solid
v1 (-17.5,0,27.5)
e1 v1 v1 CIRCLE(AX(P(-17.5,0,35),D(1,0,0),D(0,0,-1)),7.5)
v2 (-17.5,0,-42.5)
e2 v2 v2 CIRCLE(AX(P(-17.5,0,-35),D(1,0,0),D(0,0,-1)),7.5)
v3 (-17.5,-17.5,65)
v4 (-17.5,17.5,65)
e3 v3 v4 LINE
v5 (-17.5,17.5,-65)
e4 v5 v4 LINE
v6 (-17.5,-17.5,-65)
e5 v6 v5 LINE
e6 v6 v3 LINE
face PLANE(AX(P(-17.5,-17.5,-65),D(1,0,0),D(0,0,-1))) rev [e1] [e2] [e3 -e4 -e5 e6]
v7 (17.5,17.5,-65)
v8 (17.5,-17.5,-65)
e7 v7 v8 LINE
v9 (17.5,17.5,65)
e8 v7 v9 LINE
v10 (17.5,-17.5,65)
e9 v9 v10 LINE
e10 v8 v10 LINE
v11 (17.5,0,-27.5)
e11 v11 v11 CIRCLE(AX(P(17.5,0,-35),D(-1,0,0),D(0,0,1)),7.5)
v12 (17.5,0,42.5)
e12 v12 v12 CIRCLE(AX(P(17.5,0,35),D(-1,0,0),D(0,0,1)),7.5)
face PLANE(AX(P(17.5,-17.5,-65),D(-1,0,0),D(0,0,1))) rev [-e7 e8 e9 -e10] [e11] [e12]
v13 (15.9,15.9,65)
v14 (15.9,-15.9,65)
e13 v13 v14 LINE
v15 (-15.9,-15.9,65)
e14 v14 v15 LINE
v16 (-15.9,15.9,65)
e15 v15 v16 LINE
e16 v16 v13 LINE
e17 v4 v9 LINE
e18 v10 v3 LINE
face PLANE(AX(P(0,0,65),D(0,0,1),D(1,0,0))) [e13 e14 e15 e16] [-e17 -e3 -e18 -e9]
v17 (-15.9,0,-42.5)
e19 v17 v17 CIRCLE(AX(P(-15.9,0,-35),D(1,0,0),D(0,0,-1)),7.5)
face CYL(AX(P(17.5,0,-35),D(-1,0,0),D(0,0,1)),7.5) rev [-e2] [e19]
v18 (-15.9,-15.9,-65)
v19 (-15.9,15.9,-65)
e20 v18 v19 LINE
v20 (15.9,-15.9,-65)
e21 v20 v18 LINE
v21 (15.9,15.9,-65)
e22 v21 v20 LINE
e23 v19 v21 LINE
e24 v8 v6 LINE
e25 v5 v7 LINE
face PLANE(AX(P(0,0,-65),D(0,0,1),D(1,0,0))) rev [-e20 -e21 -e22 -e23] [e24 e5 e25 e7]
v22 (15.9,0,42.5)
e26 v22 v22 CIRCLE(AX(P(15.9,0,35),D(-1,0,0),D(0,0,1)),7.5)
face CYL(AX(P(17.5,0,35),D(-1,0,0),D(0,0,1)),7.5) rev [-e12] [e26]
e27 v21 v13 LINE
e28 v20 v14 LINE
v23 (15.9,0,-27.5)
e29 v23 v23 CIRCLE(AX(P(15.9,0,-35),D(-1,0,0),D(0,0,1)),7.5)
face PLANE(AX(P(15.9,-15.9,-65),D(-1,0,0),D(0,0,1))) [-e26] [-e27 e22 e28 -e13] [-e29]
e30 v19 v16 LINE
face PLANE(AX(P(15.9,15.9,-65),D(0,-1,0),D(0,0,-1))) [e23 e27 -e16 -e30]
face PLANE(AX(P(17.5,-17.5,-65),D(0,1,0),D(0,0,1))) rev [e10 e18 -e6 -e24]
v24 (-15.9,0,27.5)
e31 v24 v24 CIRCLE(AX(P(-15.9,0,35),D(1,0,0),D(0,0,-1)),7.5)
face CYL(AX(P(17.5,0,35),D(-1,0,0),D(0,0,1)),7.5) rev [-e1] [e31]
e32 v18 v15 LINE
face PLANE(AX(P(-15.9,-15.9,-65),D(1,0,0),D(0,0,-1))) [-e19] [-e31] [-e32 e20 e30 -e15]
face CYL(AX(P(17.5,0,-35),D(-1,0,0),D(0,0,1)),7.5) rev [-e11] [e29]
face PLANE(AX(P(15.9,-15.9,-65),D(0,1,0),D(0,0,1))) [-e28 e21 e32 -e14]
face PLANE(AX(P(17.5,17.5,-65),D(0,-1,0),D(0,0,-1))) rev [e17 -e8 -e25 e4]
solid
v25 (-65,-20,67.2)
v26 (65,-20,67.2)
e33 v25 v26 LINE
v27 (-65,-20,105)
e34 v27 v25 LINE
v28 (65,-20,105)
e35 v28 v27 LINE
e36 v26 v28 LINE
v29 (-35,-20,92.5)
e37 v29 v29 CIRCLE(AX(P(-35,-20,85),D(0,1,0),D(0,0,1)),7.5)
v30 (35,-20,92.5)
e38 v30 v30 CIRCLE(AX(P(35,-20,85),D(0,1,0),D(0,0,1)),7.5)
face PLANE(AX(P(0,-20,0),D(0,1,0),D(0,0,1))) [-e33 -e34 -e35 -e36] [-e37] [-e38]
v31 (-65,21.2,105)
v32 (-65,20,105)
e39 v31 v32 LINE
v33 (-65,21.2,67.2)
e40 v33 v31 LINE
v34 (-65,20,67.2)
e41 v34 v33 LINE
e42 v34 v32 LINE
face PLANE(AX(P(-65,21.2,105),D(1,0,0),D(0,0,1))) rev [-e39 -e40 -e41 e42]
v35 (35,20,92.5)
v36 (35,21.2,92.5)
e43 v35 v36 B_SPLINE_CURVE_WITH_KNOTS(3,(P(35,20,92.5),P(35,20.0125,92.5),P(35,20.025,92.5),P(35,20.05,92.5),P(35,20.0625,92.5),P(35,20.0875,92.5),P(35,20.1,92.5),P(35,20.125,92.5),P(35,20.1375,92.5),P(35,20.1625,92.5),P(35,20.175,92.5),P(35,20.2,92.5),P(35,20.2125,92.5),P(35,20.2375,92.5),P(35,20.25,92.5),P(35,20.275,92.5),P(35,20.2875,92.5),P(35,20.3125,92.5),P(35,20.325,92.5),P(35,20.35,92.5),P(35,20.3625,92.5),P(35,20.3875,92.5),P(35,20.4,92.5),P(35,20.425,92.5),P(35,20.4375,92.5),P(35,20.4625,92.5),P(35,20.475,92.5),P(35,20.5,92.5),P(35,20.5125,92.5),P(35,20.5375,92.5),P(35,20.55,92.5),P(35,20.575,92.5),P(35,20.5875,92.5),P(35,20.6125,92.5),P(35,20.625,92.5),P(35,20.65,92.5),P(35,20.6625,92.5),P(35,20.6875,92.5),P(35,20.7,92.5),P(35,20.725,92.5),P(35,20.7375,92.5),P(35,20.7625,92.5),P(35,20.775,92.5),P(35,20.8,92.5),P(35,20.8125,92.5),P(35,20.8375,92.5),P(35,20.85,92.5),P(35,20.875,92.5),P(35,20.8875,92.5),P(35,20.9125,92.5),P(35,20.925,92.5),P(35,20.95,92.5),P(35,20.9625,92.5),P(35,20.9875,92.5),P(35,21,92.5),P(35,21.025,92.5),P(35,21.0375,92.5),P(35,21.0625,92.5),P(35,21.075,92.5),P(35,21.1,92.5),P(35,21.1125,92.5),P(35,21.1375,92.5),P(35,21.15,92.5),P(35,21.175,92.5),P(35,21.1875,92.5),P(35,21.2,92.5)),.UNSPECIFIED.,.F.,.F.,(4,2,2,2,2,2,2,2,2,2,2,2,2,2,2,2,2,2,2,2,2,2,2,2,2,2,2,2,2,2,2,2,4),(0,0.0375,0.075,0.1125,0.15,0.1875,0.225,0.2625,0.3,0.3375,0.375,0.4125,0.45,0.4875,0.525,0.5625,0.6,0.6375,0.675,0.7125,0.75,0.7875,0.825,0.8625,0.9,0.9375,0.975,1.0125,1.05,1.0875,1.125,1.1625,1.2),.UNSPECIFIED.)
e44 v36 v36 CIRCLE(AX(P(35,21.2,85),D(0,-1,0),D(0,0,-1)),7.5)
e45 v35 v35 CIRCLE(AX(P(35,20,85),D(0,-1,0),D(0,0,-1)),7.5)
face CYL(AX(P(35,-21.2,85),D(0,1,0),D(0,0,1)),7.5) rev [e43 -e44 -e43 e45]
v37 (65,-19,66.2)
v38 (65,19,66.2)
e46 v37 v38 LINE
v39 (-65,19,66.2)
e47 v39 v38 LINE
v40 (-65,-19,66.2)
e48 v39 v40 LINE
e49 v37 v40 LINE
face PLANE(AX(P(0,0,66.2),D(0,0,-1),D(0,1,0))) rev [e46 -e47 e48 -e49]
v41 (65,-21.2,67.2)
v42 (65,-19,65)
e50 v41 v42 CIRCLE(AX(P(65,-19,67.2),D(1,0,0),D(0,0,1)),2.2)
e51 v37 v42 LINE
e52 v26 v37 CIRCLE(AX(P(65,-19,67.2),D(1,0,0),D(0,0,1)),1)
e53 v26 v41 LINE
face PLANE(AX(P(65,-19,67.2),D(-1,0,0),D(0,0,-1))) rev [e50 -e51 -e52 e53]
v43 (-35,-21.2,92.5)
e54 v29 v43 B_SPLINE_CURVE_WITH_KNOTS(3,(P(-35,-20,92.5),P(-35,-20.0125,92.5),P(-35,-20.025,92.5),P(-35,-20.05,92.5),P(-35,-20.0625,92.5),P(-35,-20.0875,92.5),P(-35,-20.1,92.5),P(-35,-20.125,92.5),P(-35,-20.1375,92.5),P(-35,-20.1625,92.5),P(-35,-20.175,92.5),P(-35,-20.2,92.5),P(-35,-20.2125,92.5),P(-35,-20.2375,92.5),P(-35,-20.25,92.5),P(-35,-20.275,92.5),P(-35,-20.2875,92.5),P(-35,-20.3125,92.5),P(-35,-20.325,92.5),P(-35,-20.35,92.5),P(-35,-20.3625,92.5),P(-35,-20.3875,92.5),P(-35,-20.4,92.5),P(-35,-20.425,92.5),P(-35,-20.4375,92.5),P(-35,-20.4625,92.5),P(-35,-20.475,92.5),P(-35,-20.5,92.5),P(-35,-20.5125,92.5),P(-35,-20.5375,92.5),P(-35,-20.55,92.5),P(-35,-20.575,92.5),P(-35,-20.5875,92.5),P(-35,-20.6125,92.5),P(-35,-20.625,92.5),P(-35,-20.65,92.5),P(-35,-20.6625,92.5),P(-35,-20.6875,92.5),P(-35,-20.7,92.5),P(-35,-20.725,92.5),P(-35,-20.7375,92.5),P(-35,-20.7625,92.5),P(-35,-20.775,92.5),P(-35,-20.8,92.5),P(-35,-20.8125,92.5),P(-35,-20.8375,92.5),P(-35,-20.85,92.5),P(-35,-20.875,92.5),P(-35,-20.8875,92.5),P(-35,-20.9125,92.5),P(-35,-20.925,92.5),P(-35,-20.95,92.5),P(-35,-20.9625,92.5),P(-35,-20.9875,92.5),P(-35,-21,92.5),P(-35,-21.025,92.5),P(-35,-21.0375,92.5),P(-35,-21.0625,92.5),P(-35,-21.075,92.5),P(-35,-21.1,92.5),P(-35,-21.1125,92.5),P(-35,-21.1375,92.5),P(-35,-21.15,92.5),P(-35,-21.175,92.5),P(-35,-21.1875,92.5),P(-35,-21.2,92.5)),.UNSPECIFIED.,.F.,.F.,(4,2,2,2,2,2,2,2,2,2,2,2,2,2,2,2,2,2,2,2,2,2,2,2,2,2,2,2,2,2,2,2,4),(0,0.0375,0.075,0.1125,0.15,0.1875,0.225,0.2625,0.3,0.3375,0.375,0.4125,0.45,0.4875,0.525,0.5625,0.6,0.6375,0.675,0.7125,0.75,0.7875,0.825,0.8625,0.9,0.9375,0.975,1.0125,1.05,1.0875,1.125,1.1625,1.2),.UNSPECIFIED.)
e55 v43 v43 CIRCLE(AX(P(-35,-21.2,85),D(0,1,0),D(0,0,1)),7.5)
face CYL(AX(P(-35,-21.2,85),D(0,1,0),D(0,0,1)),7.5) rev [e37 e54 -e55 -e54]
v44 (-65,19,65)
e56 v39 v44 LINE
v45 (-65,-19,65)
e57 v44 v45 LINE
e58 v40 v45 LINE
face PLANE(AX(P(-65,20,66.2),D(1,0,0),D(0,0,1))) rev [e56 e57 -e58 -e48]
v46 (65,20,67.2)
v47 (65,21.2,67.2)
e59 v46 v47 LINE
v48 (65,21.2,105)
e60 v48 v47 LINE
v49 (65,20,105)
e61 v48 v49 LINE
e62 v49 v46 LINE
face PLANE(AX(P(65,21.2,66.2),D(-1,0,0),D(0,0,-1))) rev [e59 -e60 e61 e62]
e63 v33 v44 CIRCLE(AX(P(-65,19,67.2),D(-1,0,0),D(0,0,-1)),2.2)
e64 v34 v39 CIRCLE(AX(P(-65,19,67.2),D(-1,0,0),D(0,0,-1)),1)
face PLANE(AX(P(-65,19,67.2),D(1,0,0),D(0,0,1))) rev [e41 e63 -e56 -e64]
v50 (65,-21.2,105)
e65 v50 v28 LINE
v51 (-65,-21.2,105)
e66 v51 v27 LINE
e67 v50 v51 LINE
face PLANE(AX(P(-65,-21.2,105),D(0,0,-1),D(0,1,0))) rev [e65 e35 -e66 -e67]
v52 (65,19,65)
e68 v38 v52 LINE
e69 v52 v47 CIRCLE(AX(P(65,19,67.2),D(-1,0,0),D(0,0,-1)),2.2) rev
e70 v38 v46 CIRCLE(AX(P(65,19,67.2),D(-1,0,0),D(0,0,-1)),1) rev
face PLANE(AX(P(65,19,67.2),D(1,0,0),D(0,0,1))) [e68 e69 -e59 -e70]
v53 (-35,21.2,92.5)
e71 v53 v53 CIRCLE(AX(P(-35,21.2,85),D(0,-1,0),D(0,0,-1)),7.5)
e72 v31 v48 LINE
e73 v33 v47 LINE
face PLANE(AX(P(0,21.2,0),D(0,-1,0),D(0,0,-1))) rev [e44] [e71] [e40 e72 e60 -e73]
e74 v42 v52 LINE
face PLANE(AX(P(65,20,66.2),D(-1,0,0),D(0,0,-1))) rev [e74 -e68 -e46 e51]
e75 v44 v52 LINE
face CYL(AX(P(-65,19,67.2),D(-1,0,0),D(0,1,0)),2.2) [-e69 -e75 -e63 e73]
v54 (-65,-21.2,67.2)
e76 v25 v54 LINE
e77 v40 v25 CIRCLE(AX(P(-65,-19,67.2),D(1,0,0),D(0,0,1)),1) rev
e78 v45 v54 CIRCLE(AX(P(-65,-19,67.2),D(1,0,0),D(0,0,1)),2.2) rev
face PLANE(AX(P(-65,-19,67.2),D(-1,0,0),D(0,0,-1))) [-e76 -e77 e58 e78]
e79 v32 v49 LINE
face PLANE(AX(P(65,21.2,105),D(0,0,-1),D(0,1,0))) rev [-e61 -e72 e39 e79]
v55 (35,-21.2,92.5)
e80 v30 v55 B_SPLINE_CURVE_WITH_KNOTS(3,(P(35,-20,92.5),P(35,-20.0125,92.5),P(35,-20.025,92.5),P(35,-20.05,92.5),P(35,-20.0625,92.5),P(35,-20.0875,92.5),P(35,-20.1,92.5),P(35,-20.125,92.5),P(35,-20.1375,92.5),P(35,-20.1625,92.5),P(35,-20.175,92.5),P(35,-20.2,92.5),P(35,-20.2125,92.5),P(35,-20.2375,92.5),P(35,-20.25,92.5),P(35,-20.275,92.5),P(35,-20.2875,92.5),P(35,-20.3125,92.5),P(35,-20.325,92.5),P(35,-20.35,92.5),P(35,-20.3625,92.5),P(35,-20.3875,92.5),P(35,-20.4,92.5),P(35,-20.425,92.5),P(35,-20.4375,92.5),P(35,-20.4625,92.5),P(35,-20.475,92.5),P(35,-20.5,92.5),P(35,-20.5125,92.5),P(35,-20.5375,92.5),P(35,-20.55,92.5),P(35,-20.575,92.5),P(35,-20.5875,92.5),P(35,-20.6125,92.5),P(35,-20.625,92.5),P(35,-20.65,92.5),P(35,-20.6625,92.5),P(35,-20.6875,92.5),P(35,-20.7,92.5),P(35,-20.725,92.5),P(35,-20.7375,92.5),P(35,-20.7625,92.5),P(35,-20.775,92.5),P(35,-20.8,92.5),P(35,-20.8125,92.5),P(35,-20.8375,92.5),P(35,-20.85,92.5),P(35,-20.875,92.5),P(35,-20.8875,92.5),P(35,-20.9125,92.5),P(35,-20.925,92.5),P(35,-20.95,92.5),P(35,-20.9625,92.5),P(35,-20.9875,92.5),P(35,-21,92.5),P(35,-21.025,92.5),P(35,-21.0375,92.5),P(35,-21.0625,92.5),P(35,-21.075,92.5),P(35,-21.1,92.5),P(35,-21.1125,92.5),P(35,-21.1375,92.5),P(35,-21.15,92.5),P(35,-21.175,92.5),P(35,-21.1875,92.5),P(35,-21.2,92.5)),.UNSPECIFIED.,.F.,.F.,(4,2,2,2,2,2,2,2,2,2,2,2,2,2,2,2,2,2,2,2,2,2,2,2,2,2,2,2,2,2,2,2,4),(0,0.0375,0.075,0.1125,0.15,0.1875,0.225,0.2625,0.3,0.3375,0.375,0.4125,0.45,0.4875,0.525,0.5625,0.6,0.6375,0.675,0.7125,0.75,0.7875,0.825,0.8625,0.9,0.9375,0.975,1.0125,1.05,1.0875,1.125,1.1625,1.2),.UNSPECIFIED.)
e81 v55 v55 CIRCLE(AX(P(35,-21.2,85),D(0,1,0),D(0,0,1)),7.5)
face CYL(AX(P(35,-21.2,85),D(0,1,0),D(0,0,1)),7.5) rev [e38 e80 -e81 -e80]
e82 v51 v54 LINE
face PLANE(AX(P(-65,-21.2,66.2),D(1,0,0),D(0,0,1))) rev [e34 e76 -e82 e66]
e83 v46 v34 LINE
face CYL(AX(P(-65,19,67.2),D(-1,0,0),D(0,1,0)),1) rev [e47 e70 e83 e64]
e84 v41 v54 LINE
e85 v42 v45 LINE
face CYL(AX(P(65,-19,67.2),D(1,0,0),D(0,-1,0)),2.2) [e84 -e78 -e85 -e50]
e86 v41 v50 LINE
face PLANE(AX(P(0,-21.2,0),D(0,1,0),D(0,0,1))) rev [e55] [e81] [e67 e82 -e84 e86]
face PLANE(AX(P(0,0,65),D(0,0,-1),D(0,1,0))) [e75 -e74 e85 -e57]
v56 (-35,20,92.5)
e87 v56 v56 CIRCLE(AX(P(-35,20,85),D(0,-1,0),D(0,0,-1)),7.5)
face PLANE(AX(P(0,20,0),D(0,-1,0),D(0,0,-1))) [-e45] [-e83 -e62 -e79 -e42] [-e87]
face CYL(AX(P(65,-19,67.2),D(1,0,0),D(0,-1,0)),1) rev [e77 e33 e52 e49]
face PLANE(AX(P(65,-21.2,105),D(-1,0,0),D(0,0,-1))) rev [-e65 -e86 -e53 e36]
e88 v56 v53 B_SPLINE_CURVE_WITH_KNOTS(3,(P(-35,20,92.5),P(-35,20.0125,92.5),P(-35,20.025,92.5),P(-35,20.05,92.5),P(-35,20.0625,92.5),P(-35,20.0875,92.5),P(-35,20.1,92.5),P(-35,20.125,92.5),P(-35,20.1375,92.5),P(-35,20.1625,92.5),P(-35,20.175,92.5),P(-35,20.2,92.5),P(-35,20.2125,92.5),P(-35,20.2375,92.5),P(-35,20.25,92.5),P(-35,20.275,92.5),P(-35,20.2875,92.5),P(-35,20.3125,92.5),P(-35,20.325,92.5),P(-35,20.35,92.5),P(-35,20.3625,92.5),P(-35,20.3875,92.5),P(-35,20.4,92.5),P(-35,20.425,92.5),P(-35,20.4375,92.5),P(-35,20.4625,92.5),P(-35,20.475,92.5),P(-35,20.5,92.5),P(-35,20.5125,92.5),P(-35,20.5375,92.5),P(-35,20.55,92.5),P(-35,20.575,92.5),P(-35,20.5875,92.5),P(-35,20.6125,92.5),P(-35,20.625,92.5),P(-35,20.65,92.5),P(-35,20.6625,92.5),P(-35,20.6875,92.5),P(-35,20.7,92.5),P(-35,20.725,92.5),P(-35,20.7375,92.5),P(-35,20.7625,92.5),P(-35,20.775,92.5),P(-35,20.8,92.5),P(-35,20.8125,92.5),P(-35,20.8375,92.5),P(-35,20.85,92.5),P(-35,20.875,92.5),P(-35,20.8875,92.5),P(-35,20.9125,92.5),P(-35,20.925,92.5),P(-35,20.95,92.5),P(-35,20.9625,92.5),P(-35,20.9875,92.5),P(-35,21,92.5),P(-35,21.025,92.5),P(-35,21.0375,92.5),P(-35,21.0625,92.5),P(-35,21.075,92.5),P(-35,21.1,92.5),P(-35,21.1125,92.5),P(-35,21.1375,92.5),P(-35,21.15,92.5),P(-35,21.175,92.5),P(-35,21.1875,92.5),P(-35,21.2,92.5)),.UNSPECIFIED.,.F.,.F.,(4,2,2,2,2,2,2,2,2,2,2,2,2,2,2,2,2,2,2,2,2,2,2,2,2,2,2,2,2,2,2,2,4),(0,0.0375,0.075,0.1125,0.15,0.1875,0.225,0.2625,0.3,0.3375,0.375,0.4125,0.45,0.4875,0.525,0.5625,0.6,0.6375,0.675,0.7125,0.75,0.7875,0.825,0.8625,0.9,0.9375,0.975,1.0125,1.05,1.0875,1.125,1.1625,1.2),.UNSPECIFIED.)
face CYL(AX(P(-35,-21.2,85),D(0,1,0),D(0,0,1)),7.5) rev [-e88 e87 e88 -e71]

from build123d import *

# Parameters (mm, degrees)
CROQUIS11_W                        = 35
CROQUIS11_H                        = 35
CROQUIS11_W_2                      = 31.8
CROQUIS11_H_2                      = 31.8
CUADRADO_35X35X1_6_1_DEPTH         = 130
CORTAR_EXTRUIR1_DEPTH              = 76.869954527
CORTAR_EXTRUIR1_DEPTH_BACK         = 76.869954527
CROQUIS12_R                        = 7.5
CROQUIS14_W                        = 40
CROQUIS14_H                        = 130
BRIDA_BASE1_DEPTH                  = 1.2
BRIDA_DE_ARISTA1_STRIP_W           = 6.8
BRIDA_DE_ARISTA1_STRIP_H           = 1.2
BRIDA_DE_ARISTA1_STRIP_CUT_DEPTH   = 130
BRIDA_DE_ARISTA1_STRIP_2_W         = 6.8
BRIDA_DE_ARISTA1_STRIP_2_H         = 1.2
BRIDA_DE_ARISTA1_STRIP_CUT_2_DEPTH = 130
BRIDA_DE_ARISTA1_DEPTH             = 130
BRIDA_DE_ARISTA1_BEND_DEPTH        = 130
CORTAR_EXTRUIR2_DEPTH              = 131.567070887
CORTAR_EXTRUIR2_DEPTH_BACK         = 131.567070887
CROQUIS26_R                        = 7.5
S_LIDO_MOVER_COPIAR1_ANGLE         = 90


# Sheet-metal steps are written as plain solids
with BuildPart() as part:
    # Croquis11 → Cuadrado 35X35X1.6(1) (new body)
    with BuildSketch(Plane(origin=(0, 0, 65), x_dir=(-1, 0, 0), z_dir=(0, 0, -1))):
        Rectangle(CROQUIS11_W, CROQUIS11_H)
        Rectangle(CROQUIS11_W_2, CROQUIS11_H_2, mode=Mode.SUBTRACT)
    extrude(amount=CUADRADO_35X35X1_6_1_DEPTH)

    # Croquis12 → Cortar-Extruir1 (cut, two sides: drawn at the far end of the back side and taken through both)
    with BuildSketch(Plane.ZY.offset(17.5).offset(-CORTAR_EXTRUIR1_DEPTH_BACK)):
        with Locations(Location((35, 0, 0), (0, 0, 180))):
            Circle(CROQUIS12_R)
        with Locations(Location((-35, 0, 0), (0, 0, 180))):
            Circle(CROQUIS12_R)
    extrude(amount=CORTAR_EXTRUIR1_DEPTH + CORTAR_EXTRUIR1_DEPTH_BACK, mode=Mode.SUBTRACT)


with BuildPart() as body_2:
    # Croquis14 → Brida base1 (new body)
    with BuildSketch(Plane.XY.offset(65)):
        Rectangle(CROQUIS14_W, CROQUIS14_H)
    extrude(amount=BRIDA_BASE1_DEPTH)

    # Brida de arista1 strip (across the edge) → Brida de arista1 strip cut (cut)
    with BuildSketch(Plane(origin=(20, -65, 66.2), x_dir=(-1, 0, 0), z_dir=(0, 1, 0))):
        with Locations((-2.4, -0.6)):
            Rectangle(BRIDA_DE_ARISTA1_STRIP_W, BRIDA_DE_ARISTA1_STRIP_H)
    extrude(amount=BRIDA_DE_ARISTA1_STRIP_CUT_DEPTH, mode=Mode.SUBTRACT)

    # Brida de arista1 strip 2 (across the edge) → Brida de arista1 strip cut 2 (cut)
    with BuildSketch(Plane(origin=(-20, 65, 66.2), x_dir=(1, 0, 0), z_dir=(0, -1, 0))):
        with Locations((-2.4, -0.6)):
            Rectangle(BRIDA_DE_ARISTA1_STRIP_2_W, BRIDA_DE_ARISTA1_STRIP_2_H)
    extrude(amount=BRIDA_DE_ARISTA1_STRIP_CUT_2_DEPTH, mode=Mode.SUBTRACT)

    # Brida de arista1 section (across the edge) → Brida de arista1 (add)
    with BuildSketch(Plane(origin=(20, -65, 66.2), x_dir=(-1, 0, 0), z_dir=(0, 1, 0))):
        with BuildLine():
            Line((-1.2, 1), (-1.2, 38.8))
            Line((-1.2, 38.8), (0, 38.8))
            Line((0, 38.8), (0, 1))
            ThreePointArc((0, 1), (0.292893219, 0.292893219), (1, 0))
            Line((1, 0), (1, -1.2))
            ThreePointArc((1, -1.2), (-0.555634919, -0.555634919), (-1.2, 1))
        make_face()
    extrude(amount=BRIDA_DE_ARISTA1_DEPTH)

    # Brida de arista1 section 2 (across the edge) → Brida de arista1 bend (add)
    with BuildSketch(Plane(origin=(-20, 65, 66.2), x_dir=(1, 0, 0), z_dir=(0, -1, 0))):
        with BuildLine():
            Line((-1.2, 1), (-1.2, 38.8))
            Line((-1.2, 38.8), (0, 38.8))
            Line((0, 38.8), (0, 1))
            ThreePointArc((0, 1), (0.292893219, 0.292893219), (1, 0))
            Line((1, 0), (1, -1.2))
            ThreePointArc((1, -1.2), (-0.555634919, -0.555634919), (-1.2, 1))
        make_face()
    extrude(amount=BRIDA_DE_ARISTA1_BEND_DEPTH)

    # Croquis26 → Cortar-Extruir2 (cut, two sides: drawn at the far end of the back side and taken through both)
    with BuildSketch(Plane.ZY.offset(21.2).offset(-CORTAR_EXTRUIR2_DEPTH_BACK)):
        with Locations((85, 35)):
            Circle(CROQUIS26_R)
        with Locations((85, -35)):
            Circle(CROQUIS26_R)
    extrude(amount=CORTAR_EXTRUIR2_DEPTH + CORTAR_EXTRUIR2_DEPTH_BACK, mode=Mode.SUBTRACT)


with BuildPart() as body_2_1:
    # Sólido-Mover/Copiar1: moved
    add(body_2.part.rotate(Axis((0, 0, 0), (0, 0, -1)), S_LIDO_MOVER_COPIAR1_ANGLE))


solid = Compound([part.part, body_2_1.part])
